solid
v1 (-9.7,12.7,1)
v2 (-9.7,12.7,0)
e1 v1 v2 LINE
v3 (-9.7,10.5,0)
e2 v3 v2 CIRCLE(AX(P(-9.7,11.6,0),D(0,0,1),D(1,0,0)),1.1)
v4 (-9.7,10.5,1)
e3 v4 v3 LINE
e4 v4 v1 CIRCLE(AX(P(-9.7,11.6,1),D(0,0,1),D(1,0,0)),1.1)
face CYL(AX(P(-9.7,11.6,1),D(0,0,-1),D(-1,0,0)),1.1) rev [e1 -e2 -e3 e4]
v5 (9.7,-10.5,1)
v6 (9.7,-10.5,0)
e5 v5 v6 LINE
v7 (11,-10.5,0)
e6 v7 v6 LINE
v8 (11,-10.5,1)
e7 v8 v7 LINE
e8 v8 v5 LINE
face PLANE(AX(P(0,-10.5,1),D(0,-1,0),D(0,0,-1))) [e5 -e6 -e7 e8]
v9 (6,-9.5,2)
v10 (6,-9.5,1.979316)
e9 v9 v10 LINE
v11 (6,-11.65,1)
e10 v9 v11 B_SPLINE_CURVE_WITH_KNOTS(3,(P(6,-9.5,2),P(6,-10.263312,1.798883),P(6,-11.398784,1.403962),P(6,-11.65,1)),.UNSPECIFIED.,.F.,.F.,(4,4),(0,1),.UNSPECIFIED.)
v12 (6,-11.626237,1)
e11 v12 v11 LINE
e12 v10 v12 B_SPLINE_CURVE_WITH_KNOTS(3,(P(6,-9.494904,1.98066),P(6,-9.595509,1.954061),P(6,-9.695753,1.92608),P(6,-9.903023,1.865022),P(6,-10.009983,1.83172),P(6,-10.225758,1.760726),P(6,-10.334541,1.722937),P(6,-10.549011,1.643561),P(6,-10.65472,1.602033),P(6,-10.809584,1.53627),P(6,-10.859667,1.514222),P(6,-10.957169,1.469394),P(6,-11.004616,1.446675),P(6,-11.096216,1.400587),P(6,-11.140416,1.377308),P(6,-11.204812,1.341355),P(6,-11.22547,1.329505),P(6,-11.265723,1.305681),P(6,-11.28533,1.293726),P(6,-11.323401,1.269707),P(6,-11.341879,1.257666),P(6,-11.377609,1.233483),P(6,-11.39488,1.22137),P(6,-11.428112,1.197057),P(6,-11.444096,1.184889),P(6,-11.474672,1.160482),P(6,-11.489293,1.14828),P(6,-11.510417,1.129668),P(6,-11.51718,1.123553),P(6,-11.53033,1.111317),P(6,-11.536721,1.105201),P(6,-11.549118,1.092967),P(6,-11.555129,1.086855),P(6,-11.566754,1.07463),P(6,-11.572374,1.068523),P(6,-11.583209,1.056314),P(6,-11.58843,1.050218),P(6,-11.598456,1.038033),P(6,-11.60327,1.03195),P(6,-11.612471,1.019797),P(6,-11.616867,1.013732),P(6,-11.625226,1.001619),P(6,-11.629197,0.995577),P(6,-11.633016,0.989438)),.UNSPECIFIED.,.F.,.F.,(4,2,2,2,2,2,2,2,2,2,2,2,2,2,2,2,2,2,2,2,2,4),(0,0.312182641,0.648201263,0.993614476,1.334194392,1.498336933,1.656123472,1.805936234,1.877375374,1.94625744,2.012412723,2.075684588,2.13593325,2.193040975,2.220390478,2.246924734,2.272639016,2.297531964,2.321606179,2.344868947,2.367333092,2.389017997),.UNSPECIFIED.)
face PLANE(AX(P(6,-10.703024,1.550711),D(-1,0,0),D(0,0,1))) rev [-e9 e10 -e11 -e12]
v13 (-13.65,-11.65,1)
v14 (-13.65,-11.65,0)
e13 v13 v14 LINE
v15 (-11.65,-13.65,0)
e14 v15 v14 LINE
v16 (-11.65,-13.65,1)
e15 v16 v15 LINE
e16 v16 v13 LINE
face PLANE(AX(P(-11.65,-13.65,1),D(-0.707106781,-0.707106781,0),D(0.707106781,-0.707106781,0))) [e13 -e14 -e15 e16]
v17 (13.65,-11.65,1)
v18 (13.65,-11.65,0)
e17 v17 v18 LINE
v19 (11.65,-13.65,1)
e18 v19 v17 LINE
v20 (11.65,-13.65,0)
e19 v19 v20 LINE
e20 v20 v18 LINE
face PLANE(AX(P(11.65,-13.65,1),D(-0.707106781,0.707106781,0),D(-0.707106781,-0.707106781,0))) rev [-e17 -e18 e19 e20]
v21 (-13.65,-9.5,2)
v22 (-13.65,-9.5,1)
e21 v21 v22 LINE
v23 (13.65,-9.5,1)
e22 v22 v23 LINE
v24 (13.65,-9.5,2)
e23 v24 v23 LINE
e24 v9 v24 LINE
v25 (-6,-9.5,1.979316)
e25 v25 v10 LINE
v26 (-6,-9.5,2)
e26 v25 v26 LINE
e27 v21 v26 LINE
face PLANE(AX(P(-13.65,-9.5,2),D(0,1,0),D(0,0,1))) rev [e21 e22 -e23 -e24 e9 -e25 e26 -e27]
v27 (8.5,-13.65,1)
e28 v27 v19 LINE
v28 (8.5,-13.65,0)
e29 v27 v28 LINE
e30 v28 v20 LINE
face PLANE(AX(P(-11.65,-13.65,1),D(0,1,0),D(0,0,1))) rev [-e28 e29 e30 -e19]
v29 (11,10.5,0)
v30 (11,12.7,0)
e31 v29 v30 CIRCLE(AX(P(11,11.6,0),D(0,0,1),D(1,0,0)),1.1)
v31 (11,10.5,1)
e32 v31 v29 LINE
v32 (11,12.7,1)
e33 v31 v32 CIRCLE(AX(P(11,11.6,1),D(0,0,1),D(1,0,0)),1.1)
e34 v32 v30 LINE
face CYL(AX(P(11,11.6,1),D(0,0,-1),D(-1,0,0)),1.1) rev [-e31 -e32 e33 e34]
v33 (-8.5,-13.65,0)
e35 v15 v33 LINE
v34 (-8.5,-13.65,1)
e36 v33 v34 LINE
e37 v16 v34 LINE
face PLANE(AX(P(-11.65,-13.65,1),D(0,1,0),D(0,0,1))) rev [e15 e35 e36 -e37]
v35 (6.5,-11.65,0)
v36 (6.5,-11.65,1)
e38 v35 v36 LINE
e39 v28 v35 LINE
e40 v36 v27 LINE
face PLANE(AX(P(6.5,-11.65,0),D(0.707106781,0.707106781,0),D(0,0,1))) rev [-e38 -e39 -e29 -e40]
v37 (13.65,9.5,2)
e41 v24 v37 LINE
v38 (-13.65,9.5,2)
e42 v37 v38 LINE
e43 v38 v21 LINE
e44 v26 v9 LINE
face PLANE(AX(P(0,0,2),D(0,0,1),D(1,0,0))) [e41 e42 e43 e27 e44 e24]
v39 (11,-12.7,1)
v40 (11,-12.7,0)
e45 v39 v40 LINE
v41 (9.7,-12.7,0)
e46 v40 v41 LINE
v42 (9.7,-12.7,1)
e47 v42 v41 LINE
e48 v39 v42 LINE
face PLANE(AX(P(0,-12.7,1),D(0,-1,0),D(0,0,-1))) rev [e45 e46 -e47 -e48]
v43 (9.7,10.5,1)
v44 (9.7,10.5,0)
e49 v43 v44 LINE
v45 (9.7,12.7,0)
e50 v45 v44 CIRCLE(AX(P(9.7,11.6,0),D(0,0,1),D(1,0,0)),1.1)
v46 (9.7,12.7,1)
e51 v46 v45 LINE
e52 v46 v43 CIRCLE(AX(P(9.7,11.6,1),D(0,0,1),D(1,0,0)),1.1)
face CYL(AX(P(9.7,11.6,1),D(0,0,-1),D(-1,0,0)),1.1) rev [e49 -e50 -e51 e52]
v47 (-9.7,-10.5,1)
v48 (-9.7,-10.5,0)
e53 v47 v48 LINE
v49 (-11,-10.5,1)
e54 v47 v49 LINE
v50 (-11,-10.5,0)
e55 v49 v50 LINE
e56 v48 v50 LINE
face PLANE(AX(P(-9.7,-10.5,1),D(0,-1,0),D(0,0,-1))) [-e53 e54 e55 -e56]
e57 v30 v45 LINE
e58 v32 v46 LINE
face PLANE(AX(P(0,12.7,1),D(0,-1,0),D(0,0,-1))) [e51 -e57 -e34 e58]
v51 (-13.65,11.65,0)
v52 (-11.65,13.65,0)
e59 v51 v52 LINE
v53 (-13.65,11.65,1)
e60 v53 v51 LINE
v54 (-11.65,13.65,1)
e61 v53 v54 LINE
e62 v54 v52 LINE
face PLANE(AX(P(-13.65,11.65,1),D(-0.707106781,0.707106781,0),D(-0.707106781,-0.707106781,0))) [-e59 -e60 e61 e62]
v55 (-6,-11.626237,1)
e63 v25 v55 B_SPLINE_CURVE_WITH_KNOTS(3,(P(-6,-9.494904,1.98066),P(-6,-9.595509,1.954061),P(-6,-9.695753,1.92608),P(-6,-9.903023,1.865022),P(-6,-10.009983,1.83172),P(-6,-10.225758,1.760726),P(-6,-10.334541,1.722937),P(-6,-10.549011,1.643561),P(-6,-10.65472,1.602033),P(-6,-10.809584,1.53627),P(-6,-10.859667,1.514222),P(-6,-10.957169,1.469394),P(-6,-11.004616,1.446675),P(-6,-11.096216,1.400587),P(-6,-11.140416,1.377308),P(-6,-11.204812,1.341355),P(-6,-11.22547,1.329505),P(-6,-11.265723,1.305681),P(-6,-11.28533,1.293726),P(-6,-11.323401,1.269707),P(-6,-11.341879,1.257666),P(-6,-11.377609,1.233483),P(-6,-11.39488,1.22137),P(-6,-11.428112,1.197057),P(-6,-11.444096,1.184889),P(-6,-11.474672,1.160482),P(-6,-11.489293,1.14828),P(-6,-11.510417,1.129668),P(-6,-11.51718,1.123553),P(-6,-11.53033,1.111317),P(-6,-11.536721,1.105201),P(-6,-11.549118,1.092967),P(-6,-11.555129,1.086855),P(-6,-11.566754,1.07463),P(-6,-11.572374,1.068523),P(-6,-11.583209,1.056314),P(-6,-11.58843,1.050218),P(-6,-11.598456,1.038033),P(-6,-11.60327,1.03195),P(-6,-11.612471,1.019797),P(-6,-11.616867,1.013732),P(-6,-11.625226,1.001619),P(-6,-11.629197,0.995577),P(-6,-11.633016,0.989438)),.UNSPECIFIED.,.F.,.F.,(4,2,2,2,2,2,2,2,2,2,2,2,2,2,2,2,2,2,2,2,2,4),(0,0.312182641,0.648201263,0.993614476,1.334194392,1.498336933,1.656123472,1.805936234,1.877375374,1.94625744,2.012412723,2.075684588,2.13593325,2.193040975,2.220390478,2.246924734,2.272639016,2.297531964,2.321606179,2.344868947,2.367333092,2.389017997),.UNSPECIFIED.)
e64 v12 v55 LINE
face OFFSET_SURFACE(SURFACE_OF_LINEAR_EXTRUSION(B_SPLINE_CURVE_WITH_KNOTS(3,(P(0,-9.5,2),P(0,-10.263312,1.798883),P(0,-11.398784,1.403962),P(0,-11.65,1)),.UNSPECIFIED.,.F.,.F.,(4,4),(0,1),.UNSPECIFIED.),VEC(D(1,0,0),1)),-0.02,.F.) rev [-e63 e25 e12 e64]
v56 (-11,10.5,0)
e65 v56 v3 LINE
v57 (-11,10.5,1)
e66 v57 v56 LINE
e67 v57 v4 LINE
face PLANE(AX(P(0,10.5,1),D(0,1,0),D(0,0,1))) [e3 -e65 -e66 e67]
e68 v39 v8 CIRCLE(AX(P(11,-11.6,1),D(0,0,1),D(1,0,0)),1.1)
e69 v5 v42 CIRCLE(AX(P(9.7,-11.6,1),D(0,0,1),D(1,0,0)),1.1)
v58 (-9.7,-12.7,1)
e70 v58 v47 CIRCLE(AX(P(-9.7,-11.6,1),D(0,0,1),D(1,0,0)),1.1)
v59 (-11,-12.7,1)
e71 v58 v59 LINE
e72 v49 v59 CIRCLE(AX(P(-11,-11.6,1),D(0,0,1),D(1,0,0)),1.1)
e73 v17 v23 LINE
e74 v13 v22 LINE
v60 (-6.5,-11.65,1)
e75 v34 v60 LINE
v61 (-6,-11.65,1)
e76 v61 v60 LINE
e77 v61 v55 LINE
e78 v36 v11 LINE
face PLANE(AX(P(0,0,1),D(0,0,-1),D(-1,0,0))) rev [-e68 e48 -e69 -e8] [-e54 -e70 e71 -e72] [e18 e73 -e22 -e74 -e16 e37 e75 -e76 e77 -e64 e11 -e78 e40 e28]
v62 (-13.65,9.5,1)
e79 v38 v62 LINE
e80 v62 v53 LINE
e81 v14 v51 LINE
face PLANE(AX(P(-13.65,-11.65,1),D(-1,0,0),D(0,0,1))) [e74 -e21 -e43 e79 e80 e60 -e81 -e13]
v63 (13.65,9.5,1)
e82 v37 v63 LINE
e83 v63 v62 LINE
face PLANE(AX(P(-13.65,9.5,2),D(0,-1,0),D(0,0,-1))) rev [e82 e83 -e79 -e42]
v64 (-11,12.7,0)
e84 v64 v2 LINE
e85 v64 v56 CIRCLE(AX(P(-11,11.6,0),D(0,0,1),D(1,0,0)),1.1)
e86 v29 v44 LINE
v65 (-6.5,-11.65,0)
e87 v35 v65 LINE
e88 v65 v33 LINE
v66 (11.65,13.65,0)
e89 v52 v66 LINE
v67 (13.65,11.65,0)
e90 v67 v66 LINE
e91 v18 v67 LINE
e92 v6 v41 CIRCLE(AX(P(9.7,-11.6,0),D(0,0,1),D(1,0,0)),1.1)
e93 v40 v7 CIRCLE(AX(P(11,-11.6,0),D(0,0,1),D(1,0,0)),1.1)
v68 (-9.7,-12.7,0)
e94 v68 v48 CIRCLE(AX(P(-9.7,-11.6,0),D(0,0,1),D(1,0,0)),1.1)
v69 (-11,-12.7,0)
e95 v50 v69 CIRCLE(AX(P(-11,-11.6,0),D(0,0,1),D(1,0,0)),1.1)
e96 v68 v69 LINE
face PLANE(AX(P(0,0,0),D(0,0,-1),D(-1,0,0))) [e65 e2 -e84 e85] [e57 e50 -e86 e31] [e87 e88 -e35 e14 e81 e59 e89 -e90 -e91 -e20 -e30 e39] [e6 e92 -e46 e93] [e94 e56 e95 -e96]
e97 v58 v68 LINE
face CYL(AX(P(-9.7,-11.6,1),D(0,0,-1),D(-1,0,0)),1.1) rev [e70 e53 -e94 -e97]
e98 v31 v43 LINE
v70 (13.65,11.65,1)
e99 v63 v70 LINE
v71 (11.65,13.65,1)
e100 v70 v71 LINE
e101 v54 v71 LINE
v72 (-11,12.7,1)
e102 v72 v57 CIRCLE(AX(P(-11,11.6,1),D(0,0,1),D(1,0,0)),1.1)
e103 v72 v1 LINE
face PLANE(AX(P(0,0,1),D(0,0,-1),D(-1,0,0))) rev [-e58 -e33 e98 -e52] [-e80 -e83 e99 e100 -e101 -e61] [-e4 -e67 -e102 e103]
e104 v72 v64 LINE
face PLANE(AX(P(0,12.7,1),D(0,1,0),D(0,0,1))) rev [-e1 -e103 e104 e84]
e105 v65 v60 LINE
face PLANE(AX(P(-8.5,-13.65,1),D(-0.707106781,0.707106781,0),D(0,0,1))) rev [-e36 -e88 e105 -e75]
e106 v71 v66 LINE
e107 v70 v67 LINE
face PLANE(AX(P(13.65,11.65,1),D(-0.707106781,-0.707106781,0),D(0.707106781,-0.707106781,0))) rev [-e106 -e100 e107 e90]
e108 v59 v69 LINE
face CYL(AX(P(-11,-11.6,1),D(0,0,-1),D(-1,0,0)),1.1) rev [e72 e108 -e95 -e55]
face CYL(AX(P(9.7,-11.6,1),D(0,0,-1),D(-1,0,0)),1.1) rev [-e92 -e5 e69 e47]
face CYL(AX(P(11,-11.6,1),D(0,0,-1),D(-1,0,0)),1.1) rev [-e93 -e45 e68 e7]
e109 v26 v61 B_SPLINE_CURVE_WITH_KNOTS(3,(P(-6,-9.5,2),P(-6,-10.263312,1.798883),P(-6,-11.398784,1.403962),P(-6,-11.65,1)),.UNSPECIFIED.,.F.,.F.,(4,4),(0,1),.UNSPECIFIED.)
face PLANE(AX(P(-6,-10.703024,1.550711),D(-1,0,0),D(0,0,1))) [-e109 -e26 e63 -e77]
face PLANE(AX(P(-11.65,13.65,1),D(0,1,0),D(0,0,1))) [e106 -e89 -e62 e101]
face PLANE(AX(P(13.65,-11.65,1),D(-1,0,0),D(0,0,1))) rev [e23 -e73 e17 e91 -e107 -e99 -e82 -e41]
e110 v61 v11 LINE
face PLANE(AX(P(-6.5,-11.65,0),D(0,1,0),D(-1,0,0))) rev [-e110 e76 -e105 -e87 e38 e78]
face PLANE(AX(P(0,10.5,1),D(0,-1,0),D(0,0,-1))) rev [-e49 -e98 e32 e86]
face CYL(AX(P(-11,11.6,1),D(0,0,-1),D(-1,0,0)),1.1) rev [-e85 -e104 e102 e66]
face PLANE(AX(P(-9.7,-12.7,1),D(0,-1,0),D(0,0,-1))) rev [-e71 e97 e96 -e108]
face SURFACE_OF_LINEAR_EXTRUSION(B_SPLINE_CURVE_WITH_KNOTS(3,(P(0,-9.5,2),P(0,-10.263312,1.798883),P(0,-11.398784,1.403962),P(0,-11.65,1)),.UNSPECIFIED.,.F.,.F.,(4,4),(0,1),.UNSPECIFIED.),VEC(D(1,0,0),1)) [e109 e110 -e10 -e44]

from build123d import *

# Parameters (mm, degrees)
BOSS_EXTRU_1_DEPTH      = 1
ESQUISSE2_W             = 13
ESQUISSE2_H             = 2
ENL_V_MAT_EXTRU_1_DEPTH = 1
CHANFREIN1_SIZE         = 2
ESQUISSE3_W             = 27.3
ESQUISSE3_H             = 19
BOSS_EXTRU_2_DEPTH      = 1
EPAISSIR1_START         = -6
EPAISSIR1_DEPTH         = 12


# Read off the part's stored shape, not the designer's step: Epaissir1
with BuildPart() as part:
    # Esquisse1 → Boss.-Extru.1 (new body)
    with BuildSketch(Plane.XY):
        Polygon((-11.65, -13.65), (11.65, -13.65), (13.65, -11.65), (13.65, 11.65), (11.65, 13.65), (-11.65, 13.65), (-13.65, 11.65), (-13.65, -11.65), align=None)
        with BuildLine():
            Line((-11, 12.7), (-9.7, 12.7))
            ThreePointArc((-9.7, 12.7), (-8.6, 11.6), (-9.7, 10.5))
            Line((-9.7, 10.5), (-11, 10.5))
            ThreePointArc((-11, 10.5), (-12.1, 11.6), (-11, 12.7))
        make_face(mode=Mode.SUBTRACT)
        with BuildLine():
            Line((11, 10.5), (9.7, 10.5))
            ThreePointArc((9.7, 10.5), (8.6, 11.6), (9.7, 12.7))
            Line((9.7, 12.7), (11, 12.7))
            ThreePointArc((11, 12.7), (12.1, 11.6), (11, 10.5))
        make_face(mode=Mode.SUBTRACT)
        with BuildLine():
            Line((-9.7, -12.7), (-11, -12.7))
            ThreePointArc((-11, -12.7), (-12.1, -11.6), (-11, -10.5))
            Line((-11, -10.5), (-9.7, -10.5))
            ThreePointArc((-9.7, -10.5), (-8.6, -11.6), (-9.7, -12.7))
        make_face(mode=Mode.SUBTRACT)
        with BuildLine():
            Line((11, -12.7), (9.7, -12.7))
            ThreePointArc((9.7, -12.7), (8.6, -11.6), (9.7, -10.5))
            Line((9.7, -10.5), (11, -10.5))
            ThreePointArc((11, -10.5), (12.1, -11.6), (11, -12.7))
        make_face(mode=Mode.SUBTRACT)
    extrude(amount=BOSS_EXTRU_1_DEPTH)

    # Esquisse2 → Enlèv. mat.-Extru.1 (cut)
    with BuildSketch(Plane.XY.offset(1)):
        with Locations((0, -12.65)):
            Rectangle(ESQUISSE2_W, ESQUISSE2_H)
    extrude(amount=-ENL_V_MAT_EXTRU_1_DEPTH, mode=Mode.SUBTRACT)

    # Chanfrein1
    chanfrein1_edges = [part.edges().sort_by_distance(p)[0] for p in [
        (6.5, -13.65, 0.5),
        (-6.5, -13.65, 0.5),
    ]]
    chamfer(chanfrein1_edges, length=CHANFREIN1_SIZE - 0.0001)  # a hair under: the kernel refuses the full size

    # Esquisse3 → Boss.-Extru.2 (add)
    with BuildSketch(Plane.XY.offset(1)):
        Rectangle(ESQUISSE3_W, ESQUISSE3_H)
    extrude(amount=BOSS_EXTRU_2_DEPTH)

    # Epaissir1 outline → Epaissir1 (add)
    with BuildSketch(Plane.YZ.offset(EPAISSIR1_START)):
        with BuildLine():
            add(Edge.make_bspline(
                [(-9.499999995, 1.979316014), (-9.705853917, 1.92496296), (-9.931420369, 1.860310756), (-10.169329786, 1.786375477), (-10.412025746, 1.704596537), (-10.652655847, 1.615090027), (-10.882677939, 1.520886463), (-11.096569941, 1.420298319), (-11.284403569, 1.317540699), (-11.441426278, 1.21133535), (-11.557190783, 1.104332165), (-11.626236767, 1.000000099)],
                knots=[0.002227245, 0.002227245, 0.002227245, 0.002227245, 0.002227245, 0.002227245, 0.002227245, 0.002227245, 0.002227245, 0.002227245, 0.002227245, 0.002227245, 0.990890106, 0.990890106, 0.990890106, 0.990890106, 0.990890106, 0.990890106, 0.990890106, 0.990890106, 0.990890106, 0.990890106, 0.990890106, 0.990890106], degree=11))
            Line((-9.499999995, 1.979316014), (-9.5, 2))
            add(Edge.make_bspline(
                [(-9.5, 2), (-10.263312196, 1.798883013), (-11.398783911, 1.403961588), (-11.65, 1)],
                knots=[0, 0, 0, 0, 1, 1, 1, 1], degree=3))
            Line((-11.65, 1), (-11.626236767, 1.000000099))
        make_face()
    extrude(amount=EPAISSIR1_DEPTH)


solid = part.part
